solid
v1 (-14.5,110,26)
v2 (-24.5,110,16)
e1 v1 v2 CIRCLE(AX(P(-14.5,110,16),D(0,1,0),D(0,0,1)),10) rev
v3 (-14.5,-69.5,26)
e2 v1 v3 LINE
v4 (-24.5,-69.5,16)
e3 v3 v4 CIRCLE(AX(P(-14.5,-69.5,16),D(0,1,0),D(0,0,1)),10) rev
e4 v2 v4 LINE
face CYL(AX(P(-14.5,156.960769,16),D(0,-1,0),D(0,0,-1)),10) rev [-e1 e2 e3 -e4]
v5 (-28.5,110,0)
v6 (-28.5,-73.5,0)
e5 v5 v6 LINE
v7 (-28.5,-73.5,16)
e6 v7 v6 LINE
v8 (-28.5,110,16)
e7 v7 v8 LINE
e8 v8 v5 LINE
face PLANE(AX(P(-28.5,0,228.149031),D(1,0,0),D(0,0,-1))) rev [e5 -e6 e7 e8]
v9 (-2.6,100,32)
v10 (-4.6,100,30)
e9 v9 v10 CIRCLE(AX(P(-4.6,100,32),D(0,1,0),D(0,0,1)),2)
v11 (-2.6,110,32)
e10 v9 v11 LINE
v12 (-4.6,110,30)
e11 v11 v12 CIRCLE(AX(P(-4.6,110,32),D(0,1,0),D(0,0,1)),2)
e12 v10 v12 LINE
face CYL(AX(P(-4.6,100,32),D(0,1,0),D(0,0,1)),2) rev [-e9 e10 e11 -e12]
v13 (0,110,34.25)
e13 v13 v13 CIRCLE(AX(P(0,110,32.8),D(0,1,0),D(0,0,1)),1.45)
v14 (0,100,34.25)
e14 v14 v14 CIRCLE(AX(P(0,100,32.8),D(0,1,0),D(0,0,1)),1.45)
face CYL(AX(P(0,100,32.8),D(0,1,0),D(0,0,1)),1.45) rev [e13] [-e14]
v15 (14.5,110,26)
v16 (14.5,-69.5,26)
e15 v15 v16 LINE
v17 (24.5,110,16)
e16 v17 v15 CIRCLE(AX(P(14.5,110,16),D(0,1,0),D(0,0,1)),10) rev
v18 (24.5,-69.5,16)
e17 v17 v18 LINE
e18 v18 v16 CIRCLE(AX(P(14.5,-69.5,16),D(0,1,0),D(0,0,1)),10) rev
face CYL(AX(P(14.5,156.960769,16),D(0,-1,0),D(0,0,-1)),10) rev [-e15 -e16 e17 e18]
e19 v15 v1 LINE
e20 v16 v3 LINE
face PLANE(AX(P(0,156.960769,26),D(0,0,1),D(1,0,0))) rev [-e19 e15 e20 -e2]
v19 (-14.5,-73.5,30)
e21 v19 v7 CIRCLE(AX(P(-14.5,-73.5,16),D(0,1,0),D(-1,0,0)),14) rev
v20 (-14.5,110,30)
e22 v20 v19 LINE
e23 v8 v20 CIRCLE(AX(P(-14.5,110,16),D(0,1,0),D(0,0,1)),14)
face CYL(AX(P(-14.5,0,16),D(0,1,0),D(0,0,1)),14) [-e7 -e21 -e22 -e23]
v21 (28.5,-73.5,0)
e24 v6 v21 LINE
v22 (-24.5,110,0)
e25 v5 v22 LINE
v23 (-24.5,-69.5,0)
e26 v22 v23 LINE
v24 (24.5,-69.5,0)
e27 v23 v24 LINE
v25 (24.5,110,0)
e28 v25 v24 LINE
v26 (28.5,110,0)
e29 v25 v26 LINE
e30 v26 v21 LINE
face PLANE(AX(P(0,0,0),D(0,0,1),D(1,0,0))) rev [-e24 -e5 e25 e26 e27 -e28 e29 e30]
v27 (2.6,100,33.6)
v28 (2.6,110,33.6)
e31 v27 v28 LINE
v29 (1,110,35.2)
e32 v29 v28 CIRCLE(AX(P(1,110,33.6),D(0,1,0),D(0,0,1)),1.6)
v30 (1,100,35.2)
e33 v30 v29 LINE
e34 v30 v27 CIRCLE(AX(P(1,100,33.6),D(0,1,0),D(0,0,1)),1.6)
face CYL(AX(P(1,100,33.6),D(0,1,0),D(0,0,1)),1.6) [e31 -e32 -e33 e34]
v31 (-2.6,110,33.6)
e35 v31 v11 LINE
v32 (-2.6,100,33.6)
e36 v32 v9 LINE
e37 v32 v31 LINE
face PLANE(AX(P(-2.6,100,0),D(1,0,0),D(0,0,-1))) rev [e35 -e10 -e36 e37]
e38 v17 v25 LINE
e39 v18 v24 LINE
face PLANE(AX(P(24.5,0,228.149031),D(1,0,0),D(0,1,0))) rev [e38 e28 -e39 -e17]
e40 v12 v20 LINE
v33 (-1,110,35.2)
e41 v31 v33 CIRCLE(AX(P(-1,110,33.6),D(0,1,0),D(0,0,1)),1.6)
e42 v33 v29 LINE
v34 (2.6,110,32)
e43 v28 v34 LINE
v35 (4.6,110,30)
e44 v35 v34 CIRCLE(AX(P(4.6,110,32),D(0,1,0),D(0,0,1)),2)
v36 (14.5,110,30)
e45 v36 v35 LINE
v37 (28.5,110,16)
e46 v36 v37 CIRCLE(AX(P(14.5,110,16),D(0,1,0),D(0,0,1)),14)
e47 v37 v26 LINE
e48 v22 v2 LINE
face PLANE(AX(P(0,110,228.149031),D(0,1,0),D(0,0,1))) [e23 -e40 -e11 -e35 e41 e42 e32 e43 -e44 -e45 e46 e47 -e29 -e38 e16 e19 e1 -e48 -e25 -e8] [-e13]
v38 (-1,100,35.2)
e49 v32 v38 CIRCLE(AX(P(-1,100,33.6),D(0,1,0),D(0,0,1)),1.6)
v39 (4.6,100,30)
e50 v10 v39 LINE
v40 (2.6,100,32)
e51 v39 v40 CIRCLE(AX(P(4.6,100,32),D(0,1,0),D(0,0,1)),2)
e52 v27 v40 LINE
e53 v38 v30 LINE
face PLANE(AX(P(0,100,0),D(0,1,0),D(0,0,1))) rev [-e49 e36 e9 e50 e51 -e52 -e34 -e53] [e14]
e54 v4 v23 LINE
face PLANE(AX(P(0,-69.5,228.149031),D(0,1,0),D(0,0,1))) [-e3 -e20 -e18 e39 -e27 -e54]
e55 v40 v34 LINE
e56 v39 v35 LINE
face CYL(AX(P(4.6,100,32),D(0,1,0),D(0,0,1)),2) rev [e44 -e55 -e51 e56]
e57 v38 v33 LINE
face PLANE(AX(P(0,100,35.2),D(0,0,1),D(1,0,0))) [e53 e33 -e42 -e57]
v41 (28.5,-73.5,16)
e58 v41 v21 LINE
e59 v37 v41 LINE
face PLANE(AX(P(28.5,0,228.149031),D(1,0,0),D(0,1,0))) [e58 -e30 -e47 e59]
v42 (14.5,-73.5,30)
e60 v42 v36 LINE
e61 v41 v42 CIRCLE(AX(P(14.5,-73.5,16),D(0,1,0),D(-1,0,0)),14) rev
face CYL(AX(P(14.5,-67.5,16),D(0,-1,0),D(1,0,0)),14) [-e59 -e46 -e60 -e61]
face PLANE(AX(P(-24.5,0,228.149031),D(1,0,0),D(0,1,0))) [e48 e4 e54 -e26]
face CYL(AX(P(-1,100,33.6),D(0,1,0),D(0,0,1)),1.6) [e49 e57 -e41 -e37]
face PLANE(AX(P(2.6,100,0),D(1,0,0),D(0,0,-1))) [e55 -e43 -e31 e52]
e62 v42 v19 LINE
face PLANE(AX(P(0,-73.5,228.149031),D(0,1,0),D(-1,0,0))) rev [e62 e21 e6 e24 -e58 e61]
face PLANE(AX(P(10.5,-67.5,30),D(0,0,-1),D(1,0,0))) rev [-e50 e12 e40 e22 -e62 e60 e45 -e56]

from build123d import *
from build123d.topology import SkipClean

# Parameters (mm, degrees)
SKETCH1_W           = 57
SKETCH1_H           = 183.5
SKETCH1_W_2         = 49
SKETCH1_H_2         = 175.5
BOSS_EXTRUDE1_DEPTH = 30
BOSS_EXTRUDE2_DEPTH = 175.5
FILLET1_R           = 14
CUT_EXTRUDE1_DEPTH  = 179.5
SKETCH6_R           = 1.6
SKETCH6_R_2         = 1.45
BOSS_EXTRUDE5_DEPTH = 10


with BuildPart() as part:
    # Sketch1 → Boss-Extrude1 (new body)
    with BuildSketch(Plane.XY):
        with Locations((0, 18.25)):
            Rectangle(SKETCH1_W, SKETCH1_H)
        with Locations((0, 18.25)):
            Rectangle(SKETCH1_W_2, SKETCH1_H_2, mode=Mode.SUBTRACT)
    extrude(amount=BOSS_EXTRUDE1_DEPTH)

    # Sketch2 → Boss-Extrude2 (add)
    with BuildSketch(Plane(origin=(0, -69.5, 0), x_dir=(1, 0, 0), z_dir=(0, 1, 0))):
        with BuildLine():
            Line((14.5, -26), (24.5, -26))
            Line((24.5, -26), (24.5, -16))
            ThreePointArc((24.5, -16), (21.571067812, -23.071067812), (14.5, -26))
        make_face()
        Polygon((-24.5, -30), (24.5, -30), (24.5, -26), (14.5, -26), (-14.5, -26), (-24.5, -26), align=None)
        with BuildLine():
            Line((-24.5, -16), (-24.5, -26))
            Line((-24.5, -26), (-14.5, -26))
            ThreePointArc((-14.5, -26), (-21.571067812, -23.071067812), (-24.5, -16))
        make_face()
    extrude(amount=BOSS_EXTRUDE2_DEPTH)

    # Fillet1
    fillet1_edges = [part.edges().sort_by_distance(p)[0] for p in [
        (-28.5, 18.25, 30),
        (28.5, 18.25, 30),
    ]]
    fillet(fillet1_edges, radius=FILLET1_R)

    # Sketch2<4> → Cut-Extrude1 (cut)
    with SkipClean():  # the faces are left unmerged after this step: merging them gives an invalid solid
        with BuildSketch(Plane(origin=(0, -69.5, 0), x_dir=(1, 0, 0), z_dir=(0, 1, 0))):
            with BuildLine():
                Line((-14.5, -26), (14.5, -26))
                ThreePointArc((14.5, -26), (21.571067812, -23.071067812), (24.5, -16))
                Line((24.5, -16), (24.5, 0))
                Line((24.5, 0), (-24.5, 0))
                Line((-24.5, 0), (-24.5, -16))
                ThreePointArc((-24.5, -16), (-21.571067812, -23.071067812), (-14.5, -26))
            make_face()
        extrude(amount=CUT_EXTRUDE1_DEPTH, mode=Mode.SUBTRACT)
    add(part.part.scale(1), mode=Mode.REPLACE)  # the faces are merged on a copy

    # Sketch6 → Boss-Extrude5 (add)
    # profile 1 of 2: a face of its own
    with BuildSketch(Plane(origin=(0, 110, 0), x_dir=(1, 0, 0), z_dir=(0, 1, 0))):
        with BuildLine():
            ThreePointArc((1, -35.2), (2.13137085, -34.73137085), (2.6, -33.6))
            Line((2.6, -33.6), (2.6, -32))
            ThreePointArc((2.6, -32), (3.185786438, -30.585786438), (4.6, -30))
            Line((4.6, -30), (-4.6, -30))
            ThreePointArc((-4.6, -30), (-3.185786438, -30.585786438), (-2.6, -32))
            Line((-2.6, -32), (-2.6, -33.6))
            ThreePointArc((-2.6, -33.6), (-2.13137085, -34.73137085), (-1, -35.2))
            Line((-1, -35.2), (1, -35.2))
        make_face()
        with Locations((0, -32.8)):
            Circle(SKETCH6_R, mode=Mode.SUBTRACT)
    # profile 2 of 2: a face of its own
    with BuildSketch(Plane(origin=(0, 110, 0), x_dir=(1, 0, 0), z_dir=(0, 1, 0))):
        with Locations((0, -32.8)):
            Circle(SKETCH6_R)
        with Locations(Location((0, -32.8, 0), (0, 0, 270))):
            Circle(SKETCH6_R_2, mode=Mode.SUBTRACT)
    extrude(amount=-BOSS_EXTRUDE5_DEPTH)


solid = part.part
